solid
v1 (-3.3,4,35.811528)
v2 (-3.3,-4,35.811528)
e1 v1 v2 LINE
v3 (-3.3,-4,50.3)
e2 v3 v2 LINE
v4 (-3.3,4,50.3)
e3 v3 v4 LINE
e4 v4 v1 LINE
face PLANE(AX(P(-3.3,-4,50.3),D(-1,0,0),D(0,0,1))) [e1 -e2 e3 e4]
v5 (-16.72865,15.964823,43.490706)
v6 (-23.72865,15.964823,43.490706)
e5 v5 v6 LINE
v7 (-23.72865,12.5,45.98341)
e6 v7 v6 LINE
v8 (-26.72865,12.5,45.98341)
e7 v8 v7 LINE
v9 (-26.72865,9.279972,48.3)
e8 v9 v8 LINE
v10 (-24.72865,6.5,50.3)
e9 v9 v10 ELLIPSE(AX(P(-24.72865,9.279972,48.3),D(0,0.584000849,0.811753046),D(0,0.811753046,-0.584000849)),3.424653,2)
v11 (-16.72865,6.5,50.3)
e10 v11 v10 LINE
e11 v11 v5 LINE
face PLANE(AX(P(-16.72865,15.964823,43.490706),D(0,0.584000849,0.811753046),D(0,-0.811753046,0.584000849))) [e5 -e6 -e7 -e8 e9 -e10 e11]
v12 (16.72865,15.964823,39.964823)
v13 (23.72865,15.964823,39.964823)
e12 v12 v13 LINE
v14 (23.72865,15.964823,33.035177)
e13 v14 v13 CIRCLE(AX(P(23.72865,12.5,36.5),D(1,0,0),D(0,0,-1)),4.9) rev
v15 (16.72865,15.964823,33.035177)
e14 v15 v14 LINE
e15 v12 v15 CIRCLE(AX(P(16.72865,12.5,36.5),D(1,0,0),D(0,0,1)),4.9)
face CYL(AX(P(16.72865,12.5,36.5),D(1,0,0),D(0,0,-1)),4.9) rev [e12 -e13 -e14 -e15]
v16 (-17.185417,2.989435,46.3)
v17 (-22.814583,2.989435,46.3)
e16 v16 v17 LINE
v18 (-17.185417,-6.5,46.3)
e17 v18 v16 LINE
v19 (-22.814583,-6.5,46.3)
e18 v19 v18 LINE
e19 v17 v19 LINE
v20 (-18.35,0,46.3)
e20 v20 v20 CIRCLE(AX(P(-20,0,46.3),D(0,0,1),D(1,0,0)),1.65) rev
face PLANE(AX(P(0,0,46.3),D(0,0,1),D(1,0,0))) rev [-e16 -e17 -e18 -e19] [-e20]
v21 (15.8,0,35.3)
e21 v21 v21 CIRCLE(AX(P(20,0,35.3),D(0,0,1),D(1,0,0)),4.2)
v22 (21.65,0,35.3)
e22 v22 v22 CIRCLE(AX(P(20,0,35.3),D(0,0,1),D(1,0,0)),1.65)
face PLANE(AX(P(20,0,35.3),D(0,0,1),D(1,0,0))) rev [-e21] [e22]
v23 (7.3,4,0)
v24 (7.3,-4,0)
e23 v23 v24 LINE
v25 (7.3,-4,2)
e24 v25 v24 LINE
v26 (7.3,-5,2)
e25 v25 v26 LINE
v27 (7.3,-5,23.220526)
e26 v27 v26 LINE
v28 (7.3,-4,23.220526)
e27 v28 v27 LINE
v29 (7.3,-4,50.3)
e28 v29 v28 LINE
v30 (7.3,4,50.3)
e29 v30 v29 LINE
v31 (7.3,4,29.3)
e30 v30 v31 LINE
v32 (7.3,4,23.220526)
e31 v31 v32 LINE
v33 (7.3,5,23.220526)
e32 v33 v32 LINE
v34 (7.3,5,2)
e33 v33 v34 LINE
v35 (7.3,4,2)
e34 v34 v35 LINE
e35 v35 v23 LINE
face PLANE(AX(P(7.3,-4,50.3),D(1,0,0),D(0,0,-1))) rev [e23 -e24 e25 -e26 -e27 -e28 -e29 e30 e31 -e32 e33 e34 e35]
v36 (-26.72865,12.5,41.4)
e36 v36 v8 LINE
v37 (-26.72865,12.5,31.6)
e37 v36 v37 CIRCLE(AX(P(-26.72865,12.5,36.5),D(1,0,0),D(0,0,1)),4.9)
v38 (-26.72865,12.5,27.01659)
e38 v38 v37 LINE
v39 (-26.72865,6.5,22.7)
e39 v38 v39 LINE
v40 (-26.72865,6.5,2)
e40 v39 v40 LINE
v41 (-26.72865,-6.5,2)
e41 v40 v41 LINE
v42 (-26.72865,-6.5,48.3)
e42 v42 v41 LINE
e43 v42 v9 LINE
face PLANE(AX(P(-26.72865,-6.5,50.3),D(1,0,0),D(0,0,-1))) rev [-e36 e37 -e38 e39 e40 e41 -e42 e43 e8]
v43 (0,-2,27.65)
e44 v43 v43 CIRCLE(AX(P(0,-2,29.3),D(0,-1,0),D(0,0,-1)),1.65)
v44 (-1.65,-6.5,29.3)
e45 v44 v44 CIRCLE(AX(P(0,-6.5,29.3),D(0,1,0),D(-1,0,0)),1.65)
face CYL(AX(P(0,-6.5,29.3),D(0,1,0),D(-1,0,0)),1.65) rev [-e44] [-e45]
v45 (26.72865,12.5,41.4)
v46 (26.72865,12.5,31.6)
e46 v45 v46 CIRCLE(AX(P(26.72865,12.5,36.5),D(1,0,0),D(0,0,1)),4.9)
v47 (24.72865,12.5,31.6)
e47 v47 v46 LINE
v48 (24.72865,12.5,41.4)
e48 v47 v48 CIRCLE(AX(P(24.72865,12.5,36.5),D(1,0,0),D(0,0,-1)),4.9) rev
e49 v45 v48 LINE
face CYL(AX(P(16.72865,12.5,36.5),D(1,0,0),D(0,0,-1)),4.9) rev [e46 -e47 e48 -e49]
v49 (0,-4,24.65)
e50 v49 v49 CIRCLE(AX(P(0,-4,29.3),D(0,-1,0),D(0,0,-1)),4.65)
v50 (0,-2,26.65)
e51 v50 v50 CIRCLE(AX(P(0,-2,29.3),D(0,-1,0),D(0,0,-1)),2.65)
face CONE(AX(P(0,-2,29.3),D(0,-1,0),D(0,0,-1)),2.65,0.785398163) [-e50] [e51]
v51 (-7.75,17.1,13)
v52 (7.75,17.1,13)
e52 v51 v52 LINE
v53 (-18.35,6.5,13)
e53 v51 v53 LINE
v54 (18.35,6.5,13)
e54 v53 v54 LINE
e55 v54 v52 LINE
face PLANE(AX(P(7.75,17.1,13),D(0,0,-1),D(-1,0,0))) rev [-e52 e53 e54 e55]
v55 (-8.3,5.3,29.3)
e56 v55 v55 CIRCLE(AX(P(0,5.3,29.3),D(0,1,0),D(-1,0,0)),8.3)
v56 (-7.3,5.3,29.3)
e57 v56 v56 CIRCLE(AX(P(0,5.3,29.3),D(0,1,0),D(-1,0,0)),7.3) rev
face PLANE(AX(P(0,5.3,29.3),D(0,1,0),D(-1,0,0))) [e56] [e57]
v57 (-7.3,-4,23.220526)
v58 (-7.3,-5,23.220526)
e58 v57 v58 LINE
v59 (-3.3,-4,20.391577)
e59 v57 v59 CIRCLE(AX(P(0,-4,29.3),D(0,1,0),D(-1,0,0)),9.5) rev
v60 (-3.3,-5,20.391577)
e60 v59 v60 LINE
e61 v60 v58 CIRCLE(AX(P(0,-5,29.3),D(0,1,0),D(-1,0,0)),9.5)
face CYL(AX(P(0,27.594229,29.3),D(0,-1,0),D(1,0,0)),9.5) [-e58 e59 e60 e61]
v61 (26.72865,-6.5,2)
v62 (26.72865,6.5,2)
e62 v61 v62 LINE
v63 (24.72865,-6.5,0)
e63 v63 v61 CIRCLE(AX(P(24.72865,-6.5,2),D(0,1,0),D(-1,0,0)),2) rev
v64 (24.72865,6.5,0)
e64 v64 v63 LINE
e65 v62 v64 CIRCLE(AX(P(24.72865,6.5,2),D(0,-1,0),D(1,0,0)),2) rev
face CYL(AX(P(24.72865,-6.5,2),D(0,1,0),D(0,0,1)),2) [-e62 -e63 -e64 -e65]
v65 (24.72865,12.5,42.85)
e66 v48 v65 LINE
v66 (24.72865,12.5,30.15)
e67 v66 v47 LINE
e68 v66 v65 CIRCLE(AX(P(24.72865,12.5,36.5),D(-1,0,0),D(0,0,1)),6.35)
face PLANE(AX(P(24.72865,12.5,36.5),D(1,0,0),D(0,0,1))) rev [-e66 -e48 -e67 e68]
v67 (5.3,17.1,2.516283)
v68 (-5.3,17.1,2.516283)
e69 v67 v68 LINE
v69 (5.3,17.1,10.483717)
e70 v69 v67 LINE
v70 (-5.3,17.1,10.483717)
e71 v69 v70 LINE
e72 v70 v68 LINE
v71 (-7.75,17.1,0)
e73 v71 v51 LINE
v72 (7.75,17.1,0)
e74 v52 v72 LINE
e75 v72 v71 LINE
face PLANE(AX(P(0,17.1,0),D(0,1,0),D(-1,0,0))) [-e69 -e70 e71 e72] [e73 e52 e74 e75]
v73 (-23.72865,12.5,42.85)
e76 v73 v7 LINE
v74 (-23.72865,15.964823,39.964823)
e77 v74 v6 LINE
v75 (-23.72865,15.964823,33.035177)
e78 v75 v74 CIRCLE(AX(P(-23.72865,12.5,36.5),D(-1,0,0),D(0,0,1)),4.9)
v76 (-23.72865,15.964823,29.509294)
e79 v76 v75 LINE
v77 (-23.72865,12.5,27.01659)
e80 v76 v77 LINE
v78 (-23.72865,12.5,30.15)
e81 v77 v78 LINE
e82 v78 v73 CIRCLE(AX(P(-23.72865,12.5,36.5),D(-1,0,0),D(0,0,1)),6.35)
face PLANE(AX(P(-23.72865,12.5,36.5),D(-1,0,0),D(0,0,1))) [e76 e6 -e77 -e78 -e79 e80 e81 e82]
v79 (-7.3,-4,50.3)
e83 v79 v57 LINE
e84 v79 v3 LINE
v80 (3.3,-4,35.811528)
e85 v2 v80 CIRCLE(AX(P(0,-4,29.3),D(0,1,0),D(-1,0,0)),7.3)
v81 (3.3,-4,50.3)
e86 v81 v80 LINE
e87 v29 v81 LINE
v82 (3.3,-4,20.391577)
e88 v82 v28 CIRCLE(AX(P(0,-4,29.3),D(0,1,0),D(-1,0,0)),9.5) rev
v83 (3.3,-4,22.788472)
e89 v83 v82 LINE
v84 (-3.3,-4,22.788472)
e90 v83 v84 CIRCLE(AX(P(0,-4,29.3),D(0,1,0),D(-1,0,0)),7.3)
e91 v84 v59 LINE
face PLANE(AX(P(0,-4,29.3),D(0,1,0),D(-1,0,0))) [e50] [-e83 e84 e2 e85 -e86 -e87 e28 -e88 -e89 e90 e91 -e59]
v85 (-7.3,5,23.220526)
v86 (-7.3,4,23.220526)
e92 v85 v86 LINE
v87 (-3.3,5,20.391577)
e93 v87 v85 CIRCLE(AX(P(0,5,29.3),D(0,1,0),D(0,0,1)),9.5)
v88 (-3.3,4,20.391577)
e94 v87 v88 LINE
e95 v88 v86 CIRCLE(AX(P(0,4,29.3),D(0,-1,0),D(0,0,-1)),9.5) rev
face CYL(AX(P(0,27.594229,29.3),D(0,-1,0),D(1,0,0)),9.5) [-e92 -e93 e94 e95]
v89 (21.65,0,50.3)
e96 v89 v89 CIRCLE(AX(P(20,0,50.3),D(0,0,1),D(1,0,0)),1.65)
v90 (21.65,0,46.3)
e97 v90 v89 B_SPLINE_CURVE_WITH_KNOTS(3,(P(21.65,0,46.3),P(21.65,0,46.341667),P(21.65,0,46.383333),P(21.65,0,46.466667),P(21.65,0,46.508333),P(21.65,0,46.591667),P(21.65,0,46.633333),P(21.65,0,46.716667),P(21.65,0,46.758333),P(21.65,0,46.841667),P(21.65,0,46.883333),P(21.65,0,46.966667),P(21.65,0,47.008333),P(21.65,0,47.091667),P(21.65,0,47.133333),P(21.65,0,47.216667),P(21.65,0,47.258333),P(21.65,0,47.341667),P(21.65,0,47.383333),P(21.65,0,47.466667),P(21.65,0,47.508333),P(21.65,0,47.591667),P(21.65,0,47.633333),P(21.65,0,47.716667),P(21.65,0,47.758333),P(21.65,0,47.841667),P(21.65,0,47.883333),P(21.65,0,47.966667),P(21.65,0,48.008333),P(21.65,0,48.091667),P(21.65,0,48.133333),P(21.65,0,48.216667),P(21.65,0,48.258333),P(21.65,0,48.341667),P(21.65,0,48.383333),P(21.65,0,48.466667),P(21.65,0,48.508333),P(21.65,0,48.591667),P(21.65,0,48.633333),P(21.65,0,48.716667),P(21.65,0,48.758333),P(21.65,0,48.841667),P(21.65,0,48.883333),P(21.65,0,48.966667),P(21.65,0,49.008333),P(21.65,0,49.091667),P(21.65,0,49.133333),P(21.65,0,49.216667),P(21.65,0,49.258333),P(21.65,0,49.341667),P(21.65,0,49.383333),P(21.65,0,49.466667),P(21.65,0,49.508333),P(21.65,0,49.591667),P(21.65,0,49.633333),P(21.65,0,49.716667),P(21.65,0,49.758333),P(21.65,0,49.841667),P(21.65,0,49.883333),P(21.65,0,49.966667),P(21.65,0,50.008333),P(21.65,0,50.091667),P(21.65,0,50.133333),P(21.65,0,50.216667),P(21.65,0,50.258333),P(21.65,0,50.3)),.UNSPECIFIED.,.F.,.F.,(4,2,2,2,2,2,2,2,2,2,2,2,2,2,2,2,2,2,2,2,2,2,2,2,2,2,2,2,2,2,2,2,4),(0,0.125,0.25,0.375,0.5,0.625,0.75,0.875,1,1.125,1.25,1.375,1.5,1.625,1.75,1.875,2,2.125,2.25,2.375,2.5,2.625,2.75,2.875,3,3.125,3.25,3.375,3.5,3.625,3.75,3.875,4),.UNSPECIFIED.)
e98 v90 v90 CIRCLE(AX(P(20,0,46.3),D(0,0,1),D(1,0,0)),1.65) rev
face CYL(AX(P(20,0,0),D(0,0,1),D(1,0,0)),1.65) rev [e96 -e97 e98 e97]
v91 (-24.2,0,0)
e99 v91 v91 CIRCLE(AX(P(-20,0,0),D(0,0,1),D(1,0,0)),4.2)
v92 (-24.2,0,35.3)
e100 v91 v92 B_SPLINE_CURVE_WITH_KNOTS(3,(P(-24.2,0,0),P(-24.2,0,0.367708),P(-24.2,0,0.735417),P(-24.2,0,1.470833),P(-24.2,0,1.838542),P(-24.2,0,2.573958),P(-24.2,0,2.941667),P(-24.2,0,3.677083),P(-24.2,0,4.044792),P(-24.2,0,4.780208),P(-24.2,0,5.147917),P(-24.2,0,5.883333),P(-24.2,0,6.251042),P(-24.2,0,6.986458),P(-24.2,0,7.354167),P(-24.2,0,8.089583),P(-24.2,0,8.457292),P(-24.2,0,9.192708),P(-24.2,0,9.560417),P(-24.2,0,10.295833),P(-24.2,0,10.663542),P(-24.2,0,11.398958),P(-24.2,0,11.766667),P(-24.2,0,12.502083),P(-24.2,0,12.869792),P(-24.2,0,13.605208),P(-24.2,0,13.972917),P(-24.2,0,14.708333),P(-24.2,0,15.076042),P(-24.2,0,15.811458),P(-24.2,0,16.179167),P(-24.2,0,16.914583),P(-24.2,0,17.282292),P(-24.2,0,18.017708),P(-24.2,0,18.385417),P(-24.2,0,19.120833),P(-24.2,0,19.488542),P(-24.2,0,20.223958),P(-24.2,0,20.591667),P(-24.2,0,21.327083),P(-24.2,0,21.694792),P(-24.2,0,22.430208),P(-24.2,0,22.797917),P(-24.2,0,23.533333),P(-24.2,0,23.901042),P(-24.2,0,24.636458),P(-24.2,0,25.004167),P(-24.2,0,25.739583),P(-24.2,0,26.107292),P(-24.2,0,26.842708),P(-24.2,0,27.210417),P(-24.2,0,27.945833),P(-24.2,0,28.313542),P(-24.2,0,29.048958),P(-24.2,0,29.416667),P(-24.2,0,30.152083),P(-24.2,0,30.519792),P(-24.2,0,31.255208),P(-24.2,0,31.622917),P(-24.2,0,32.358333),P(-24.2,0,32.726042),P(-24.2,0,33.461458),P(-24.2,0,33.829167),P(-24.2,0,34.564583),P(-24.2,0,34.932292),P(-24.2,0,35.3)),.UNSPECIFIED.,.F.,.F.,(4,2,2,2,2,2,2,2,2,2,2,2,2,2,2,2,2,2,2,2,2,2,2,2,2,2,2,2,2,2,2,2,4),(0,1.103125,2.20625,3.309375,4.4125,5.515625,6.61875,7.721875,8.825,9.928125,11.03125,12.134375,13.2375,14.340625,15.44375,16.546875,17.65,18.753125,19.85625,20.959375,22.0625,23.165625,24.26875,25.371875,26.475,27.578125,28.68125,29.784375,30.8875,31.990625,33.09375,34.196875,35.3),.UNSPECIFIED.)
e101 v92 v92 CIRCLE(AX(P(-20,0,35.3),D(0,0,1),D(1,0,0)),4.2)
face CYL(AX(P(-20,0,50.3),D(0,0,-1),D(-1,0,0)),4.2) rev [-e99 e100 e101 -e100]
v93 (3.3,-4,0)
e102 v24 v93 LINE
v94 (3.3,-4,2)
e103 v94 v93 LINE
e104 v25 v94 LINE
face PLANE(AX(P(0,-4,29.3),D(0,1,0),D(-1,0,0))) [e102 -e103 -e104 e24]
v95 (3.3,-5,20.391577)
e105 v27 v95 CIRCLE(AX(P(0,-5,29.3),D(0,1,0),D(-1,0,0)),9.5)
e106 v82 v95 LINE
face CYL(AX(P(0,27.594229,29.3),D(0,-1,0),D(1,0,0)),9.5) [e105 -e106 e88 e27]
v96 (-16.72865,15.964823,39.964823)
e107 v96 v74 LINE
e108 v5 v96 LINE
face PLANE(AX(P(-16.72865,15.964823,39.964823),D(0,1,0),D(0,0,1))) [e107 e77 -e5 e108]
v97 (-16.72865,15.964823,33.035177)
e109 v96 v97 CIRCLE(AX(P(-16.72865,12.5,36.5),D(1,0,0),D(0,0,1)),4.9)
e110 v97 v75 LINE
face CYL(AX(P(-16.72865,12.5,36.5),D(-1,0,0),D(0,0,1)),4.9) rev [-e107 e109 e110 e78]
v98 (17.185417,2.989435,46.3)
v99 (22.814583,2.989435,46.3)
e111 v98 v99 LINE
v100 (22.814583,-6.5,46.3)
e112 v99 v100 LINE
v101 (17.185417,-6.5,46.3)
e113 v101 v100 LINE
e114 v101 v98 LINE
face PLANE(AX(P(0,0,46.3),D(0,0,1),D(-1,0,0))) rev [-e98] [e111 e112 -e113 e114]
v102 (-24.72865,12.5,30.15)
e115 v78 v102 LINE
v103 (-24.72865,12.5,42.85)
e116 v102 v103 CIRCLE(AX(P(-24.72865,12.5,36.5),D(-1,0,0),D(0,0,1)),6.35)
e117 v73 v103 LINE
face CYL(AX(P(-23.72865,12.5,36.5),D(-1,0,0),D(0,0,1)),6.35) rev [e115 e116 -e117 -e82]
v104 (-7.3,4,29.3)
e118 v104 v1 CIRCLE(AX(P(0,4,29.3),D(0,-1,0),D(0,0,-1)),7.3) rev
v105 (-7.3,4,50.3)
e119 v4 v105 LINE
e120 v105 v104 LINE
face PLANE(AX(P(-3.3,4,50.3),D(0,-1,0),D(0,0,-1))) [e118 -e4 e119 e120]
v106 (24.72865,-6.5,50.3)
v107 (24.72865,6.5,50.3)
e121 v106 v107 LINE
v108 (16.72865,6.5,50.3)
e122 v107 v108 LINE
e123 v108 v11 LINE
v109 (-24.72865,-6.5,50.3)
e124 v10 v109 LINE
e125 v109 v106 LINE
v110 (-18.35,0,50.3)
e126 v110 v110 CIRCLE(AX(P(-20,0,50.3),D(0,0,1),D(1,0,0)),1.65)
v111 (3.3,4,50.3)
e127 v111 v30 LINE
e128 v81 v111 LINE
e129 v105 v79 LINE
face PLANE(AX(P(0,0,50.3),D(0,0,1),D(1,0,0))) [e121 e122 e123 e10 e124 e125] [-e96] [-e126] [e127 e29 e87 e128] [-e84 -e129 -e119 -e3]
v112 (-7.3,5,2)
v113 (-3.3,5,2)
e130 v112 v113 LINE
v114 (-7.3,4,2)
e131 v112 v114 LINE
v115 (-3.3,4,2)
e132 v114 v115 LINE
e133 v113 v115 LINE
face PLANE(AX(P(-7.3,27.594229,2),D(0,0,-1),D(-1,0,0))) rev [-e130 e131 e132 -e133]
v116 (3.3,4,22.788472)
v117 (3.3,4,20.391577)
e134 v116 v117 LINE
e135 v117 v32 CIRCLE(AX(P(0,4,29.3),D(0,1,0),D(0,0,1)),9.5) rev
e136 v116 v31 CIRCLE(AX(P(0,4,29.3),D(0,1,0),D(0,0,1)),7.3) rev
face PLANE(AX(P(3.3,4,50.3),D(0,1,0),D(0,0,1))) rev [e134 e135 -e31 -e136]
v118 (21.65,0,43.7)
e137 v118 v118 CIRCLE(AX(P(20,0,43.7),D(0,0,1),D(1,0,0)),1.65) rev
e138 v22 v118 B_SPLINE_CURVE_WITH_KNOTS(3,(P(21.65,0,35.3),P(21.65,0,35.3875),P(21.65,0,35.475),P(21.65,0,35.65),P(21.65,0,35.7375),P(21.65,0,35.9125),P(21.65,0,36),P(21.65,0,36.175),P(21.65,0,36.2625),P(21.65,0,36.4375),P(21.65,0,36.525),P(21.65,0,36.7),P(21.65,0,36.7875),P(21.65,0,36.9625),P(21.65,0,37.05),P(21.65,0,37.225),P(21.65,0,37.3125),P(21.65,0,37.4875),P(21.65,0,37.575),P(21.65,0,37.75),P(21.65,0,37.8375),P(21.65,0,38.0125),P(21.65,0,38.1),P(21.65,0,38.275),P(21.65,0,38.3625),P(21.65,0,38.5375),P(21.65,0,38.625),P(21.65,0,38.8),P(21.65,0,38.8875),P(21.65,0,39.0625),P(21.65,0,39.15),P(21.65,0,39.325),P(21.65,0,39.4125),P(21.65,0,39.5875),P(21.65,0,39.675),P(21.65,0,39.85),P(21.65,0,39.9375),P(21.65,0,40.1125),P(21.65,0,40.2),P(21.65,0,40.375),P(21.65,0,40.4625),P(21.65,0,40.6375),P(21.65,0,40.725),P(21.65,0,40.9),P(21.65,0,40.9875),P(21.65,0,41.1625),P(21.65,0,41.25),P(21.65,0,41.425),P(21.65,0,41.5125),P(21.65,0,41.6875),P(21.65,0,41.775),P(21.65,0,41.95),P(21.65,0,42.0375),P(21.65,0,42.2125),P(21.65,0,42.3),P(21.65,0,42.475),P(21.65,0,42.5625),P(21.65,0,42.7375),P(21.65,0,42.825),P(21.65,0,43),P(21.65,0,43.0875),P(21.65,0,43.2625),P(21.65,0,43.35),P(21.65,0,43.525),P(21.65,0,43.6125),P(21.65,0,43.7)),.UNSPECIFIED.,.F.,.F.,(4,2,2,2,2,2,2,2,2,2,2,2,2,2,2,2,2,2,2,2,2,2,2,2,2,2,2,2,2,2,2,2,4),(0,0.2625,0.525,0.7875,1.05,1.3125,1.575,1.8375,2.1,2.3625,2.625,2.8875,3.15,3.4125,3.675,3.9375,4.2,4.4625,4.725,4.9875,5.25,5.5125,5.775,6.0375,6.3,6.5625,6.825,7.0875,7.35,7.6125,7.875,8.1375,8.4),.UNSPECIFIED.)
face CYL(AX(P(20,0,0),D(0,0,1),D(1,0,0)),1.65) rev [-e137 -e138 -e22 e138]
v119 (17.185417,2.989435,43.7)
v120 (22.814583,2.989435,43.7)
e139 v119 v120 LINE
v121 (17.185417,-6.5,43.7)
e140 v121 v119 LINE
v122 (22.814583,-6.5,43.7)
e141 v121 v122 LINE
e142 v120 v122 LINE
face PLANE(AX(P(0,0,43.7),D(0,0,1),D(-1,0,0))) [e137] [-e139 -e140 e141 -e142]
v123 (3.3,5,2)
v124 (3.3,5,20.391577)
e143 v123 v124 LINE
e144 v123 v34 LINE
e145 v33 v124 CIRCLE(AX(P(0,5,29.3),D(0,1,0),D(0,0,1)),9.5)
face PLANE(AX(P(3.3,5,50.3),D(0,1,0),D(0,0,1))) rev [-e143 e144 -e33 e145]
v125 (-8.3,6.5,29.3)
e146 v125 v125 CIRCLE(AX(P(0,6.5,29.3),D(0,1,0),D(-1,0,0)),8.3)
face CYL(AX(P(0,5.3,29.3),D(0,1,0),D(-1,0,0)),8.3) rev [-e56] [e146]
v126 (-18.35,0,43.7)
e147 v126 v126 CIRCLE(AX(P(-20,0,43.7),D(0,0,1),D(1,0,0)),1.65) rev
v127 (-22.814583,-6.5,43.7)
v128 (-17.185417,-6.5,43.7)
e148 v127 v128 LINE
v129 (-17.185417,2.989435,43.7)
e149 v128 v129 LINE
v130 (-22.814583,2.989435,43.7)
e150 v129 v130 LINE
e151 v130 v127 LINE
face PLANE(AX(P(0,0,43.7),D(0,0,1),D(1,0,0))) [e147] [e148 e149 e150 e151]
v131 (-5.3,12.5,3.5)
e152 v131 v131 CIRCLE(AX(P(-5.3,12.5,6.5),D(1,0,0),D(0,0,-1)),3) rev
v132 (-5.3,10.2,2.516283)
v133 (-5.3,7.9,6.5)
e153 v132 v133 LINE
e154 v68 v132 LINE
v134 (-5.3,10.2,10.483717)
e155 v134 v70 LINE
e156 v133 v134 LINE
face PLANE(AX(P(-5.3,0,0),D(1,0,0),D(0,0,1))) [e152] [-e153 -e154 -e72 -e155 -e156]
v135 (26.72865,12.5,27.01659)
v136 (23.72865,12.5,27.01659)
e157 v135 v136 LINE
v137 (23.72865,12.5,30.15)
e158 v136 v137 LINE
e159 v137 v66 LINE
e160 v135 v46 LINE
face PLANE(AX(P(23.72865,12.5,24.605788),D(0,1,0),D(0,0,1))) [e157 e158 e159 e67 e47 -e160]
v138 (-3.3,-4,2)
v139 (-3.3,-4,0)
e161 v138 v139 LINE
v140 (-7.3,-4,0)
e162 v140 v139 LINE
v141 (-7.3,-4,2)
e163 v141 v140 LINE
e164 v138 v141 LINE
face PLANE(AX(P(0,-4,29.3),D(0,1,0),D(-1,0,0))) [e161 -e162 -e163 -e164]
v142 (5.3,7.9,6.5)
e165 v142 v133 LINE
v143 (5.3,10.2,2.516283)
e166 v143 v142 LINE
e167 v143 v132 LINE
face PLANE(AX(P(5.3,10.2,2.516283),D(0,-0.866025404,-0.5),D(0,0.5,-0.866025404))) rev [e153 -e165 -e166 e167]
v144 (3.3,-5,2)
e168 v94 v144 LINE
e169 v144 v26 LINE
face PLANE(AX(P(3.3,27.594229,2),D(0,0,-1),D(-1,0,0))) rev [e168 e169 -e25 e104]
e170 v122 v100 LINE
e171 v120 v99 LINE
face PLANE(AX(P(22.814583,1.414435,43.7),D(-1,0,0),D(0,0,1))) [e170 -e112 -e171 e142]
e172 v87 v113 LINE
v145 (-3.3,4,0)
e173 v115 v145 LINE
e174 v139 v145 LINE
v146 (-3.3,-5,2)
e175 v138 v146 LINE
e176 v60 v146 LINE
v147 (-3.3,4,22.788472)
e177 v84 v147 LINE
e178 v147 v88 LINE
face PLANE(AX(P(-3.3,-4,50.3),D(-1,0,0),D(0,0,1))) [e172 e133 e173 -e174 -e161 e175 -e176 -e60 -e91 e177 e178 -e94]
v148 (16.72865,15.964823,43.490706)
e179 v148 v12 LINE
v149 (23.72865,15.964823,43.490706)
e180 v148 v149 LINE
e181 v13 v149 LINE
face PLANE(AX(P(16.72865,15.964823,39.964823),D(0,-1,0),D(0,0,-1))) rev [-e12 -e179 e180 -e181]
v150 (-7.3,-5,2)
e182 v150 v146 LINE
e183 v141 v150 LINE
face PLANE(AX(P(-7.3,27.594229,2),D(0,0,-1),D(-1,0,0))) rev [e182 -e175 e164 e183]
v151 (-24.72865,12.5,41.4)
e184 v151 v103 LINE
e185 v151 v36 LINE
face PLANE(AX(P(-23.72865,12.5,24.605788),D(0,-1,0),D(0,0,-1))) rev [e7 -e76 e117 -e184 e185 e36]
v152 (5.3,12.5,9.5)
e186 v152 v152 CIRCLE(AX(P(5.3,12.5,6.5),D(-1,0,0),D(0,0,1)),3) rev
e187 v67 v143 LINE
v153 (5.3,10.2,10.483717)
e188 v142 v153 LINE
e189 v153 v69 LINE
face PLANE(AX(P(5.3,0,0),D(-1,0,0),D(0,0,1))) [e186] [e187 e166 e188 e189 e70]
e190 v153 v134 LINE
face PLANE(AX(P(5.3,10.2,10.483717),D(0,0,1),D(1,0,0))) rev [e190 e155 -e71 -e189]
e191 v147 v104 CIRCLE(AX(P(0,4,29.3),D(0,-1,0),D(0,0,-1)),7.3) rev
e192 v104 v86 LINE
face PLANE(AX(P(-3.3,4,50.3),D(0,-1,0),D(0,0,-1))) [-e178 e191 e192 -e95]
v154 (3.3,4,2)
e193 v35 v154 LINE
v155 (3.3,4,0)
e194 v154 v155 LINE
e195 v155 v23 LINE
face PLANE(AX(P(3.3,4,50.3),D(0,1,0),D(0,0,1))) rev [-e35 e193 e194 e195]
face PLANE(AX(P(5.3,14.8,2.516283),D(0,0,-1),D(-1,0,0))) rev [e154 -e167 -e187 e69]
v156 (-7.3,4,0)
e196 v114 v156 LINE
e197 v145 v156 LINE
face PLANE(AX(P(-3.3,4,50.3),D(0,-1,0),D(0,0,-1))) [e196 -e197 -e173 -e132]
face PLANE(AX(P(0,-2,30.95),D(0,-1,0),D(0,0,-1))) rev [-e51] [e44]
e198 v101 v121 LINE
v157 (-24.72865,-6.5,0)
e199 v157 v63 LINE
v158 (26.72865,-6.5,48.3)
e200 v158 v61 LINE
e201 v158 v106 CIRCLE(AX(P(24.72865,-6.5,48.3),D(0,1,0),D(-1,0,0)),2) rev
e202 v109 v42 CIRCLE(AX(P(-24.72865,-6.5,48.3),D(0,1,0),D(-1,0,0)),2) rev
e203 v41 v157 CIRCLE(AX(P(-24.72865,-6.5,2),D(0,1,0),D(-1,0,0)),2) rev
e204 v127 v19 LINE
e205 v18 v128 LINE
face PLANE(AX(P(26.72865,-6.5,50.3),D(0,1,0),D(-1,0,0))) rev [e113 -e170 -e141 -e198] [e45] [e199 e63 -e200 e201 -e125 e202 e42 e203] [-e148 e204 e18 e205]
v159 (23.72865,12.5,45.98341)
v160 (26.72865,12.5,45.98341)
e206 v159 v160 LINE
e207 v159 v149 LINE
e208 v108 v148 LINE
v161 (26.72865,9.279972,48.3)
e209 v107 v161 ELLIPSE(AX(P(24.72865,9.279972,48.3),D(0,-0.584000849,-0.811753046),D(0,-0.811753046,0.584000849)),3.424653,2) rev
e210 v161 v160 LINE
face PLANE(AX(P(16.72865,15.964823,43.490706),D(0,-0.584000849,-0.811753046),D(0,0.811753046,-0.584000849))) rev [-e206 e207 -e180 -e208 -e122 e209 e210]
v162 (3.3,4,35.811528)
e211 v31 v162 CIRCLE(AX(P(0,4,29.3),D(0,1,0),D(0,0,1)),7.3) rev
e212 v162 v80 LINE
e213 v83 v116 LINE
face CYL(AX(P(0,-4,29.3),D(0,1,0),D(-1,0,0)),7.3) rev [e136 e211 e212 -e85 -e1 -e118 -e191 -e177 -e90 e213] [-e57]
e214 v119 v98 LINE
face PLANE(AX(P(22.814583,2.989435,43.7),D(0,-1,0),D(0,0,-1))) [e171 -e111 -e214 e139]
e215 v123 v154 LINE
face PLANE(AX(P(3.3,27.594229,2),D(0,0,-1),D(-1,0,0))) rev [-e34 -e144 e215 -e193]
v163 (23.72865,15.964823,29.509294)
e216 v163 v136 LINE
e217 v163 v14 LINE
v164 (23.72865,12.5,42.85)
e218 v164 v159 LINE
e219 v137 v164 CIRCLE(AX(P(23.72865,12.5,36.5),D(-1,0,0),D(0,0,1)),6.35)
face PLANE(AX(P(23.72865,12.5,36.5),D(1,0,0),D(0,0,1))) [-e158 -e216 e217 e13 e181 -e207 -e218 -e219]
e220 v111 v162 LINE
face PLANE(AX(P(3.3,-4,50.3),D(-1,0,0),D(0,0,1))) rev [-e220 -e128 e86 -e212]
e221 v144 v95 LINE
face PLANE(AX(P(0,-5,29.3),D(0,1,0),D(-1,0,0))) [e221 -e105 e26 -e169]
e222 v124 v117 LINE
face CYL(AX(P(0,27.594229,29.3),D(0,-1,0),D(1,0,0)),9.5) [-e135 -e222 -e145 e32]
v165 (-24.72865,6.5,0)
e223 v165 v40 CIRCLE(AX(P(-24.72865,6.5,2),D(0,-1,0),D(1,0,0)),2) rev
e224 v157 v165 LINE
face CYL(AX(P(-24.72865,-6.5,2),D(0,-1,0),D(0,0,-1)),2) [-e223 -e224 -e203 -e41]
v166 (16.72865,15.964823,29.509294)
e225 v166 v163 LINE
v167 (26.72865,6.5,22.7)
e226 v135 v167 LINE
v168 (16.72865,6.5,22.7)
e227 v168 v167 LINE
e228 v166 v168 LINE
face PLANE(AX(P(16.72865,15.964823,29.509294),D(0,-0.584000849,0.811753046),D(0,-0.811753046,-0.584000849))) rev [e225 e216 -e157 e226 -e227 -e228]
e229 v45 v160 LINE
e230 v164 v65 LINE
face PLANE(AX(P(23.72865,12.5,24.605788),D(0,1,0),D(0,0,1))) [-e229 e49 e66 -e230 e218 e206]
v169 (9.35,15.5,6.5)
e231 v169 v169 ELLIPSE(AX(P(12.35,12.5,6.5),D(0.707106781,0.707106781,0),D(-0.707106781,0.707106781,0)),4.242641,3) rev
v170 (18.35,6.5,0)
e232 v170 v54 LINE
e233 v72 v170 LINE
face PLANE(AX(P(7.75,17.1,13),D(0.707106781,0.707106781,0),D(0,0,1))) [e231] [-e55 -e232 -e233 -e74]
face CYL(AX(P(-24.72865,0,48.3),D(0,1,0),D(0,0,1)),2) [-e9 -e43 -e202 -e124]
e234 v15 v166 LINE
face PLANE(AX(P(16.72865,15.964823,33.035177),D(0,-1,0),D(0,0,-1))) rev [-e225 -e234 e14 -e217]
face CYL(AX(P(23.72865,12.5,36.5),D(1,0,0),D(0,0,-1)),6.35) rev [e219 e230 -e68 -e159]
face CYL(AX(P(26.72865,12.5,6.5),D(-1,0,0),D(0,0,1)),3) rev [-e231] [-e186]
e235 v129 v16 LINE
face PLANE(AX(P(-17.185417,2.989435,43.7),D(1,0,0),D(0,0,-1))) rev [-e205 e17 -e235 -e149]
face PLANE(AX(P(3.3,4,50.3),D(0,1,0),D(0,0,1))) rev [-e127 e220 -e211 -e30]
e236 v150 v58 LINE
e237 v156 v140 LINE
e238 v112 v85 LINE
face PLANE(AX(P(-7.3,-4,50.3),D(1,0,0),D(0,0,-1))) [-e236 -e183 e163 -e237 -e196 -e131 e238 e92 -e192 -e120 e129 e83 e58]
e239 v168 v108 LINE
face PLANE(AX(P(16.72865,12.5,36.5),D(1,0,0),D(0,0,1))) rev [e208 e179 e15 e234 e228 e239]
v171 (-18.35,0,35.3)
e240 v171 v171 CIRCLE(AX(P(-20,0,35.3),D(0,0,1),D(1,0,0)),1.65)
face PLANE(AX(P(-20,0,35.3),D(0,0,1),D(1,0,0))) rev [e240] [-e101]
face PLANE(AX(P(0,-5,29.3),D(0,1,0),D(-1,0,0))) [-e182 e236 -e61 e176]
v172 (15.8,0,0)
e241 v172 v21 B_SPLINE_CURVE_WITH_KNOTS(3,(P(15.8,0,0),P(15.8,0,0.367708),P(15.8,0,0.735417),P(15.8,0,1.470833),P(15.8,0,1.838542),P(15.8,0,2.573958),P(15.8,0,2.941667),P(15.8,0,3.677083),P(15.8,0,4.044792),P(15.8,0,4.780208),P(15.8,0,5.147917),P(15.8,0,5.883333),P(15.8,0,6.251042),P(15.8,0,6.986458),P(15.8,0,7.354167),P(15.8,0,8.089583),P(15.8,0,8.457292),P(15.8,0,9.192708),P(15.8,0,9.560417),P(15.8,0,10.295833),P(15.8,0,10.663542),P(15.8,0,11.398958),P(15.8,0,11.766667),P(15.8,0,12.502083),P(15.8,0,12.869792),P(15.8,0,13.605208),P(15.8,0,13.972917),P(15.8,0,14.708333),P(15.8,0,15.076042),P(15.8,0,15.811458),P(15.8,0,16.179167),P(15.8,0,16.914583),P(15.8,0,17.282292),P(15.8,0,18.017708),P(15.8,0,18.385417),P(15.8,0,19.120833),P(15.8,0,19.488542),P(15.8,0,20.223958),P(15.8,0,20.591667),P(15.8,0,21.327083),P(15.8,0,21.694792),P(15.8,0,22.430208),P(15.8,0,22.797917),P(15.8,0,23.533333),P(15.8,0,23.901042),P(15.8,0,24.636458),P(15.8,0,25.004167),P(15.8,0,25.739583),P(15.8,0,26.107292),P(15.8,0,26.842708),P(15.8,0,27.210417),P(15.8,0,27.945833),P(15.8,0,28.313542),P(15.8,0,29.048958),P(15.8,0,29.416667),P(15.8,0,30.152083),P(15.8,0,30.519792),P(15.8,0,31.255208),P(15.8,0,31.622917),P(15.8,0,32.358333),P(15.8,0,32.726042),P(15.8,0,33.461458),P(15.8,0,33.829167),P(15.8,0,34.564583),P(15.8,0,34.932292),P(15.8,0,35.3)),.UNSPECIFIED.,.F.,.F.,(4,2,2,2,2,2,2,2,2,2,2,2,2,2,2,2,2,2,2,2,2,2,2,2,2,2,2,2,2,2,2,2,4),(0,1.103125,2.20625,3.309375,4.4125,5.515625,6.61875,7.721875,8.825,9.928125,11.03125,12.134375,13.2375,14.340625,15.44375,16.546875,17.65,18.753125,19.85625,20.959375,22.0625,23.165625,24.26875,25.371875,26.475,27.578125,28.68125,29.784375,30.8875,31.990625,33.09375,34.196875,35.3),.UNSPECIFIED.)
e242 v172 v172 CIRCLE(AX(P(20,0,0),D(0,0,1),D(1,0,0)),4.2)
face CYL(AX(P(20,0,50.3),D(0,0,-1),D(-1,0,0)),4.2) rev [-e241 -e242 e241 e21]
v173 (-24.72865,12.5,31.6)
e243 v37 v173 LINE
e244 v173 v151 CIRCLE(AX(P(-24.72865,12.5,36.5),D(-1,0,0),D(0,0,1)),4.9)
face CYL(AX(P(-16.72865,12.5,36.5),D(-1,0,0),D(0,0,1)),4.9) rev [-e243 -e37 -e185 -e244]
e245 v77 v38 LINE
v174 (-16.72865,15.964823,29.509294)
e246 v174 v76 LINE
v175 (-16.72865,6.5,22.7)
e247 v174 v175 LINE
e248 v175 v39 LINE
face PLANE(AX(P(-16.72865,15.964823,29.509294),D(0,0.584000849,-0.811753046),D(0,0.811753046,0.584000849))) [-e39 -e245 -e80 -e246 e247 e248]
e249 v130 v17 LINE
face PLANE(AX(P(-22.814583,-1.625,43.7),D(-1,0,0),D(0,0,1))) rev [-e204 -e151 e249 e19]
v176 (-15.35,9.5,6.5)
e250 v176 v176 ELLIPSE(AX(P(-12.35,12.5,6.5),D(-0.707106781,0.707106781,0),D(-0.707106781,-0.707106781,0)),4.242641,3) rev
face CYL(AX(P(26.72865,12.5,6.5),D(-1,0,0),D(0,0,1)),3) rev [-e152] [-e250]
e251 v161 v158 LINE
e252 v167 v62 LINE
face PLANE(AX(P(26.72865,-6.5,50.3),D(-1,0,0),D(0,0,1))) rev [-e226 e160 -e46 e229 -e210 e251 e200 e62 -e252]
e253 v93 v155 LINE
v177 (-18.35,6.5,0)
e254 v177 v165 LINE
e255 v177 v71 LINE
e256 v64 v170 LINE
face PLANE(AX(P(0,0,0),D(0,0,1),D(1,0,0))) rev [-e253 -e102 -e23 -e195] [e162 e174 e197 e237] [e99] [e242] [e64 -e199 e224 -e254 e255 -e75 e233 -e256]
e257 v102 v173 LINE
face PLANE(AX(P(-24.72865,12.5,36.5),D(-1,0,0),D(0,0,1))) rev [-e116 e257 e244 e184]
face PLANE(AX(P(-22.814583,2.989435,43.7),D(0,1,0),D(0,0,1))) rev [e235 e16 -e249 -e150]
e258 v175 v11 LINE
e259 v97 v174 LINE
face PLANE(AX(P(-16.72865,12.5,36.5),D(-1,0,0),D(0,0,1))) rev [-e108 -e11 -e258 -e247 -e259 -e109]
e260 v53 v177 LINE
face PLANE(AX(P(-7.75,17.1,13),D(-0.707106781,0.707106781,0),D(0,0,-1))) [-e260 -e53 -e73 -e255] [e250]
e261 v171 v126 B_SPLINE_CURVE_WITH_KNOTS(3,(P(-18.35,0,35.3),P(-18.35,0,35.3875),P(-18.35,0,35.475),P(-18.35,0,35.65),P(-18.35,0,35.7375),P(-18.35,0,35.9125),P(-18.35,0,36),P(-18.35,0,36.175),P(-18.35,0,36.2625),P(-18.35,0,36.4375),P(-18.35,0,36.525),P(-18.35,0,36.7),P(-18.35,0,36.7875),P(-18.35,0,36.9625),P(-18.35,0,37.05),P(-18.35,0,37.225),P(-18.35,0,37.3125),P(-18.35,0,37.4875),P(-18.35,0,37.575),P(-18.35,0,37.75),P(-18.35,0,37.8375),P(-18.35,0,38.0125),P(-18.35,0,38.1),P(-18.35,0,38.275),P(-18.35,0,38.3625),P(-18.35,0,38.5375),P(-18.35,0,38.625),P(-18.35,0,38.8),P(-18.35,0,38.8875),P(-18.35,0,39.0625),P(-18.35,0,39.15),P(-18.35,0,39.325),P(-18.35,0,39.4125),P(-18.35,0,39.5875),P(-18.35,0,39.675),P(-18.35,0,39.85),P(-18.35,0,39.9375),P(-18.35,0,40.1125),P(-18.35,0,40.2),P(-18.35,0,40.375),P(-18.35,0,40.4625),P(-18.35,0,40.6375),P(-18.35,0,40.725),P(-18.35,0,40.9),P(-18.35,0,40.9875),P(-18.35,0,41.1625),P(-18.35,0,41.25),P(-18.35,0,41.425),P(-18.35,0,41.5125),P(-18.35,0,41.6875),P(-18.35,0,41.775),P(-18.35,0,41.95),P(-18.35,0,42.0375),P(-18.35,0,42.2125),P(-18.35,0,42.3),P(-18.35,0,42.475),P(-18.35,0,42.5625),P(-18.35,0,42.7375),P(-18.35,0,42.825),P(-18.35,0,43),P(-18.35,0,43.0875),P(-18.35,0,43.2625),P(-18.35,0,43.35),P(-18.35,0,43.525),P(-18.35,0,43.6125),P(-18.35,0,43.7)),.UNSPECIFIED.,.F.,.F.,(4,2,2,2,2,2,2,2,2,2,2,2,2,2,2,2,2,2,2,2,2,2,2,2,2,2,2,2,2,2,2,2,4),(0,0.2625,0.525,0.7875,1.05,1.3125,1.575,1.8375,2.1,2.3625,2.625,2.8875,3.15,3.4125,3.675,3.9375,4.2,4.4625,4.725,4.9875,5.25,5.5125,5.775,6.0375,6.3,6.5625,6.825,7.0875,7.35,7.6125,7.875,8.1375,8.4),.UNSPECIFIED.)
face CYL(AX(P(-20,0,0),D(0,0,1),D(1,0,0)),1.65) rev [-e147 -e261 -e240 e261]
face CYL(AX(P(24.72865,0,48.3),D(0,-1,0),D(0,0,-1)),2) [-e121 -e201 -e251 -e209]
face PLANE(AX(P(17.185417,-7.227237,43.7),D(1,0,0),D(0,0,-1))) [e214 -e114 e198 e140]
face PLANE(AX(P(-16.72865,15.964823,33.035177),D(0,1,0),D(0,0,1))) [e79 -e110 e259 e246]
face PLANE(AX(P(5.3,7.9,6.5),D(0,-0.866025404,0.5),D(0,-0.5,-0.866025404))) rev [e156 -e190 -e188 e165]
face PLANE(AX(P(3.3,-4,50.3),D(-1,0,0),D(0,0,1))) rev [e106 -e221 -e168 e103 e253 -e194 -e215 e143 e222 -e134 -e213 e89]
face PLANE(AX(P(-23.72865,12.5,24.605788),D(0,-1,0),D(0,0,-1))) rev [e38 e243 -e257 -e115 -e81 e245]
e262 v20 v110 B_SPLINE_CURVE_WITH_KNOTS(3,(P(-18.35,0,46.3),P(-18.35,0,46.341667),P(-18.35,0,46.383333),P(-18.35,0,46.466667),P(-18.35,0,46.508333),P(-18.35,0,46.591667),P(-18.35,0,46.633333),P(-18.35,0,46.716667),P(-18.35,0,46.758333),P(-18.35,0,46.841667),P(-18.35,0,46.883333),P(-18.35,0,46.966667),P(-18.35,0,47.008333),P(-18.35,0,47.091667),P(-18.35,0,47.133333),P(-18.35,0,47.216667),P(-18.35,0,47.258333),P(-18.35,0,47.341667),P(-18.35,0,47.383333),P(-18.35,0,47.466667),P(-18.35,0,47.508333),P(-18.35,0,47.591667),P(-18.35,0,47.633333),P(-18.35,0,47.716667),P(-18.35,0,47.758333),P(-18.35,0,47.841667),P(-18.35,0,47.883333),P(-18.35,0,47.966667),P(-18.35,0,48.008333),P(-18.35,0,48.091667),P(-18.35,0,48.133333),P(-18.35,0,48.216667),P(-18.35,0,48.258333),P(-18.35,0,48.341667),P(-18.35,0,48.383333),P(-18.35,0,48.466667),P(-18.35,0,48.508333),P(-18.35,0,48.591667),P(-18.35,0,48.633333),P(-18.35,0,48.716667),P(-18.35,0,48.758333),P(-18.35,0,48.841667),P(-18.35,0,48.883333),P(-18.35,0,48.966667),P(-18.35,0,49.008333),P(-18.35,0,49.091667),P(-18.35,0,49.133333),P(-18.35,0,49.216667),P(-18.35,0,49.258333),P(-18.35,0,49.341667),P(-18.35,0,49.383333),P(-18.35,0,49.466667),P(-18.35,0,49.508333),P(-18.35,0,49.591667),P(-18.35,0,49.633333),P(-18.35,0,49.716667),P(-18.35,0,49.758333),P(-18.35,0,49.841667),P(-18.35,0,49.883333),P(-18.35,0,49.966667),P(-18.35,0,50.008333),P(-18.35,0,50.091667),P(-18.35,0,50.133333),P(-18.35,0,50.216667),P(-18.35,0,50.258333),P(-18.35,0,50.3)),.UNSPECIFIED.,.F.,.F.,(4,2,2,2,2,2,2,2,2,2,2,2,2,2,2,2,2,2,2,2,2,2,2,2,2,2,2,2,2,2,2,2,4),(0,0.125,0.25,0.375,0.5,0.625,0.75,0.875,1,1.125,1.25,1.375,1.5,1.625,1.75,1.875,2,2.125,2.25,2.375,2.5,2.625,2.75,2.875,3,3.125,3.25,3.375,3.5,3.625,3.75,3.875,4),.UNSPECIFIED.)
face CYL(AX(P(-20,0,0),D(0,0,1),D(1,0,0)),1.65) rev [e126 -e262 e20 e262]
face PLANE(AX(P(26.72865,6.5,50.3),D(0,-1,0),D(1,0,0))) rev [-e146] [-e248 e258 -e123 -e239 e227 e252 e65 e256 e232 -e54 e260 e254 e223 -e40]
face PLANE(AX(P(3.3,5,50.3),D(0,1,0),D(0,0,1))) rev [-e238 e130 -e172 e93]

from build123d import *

# Parameters (mm, degrees)
SKETCH1_W           = 53.4573
SKETCH1_H           = 13
SKETCH1_R           = 4.2
BOSS_EXTRUDE1_DEPTH = 50.3
BOSS_EXTRUDE2_START = -15
SKETCH3_R           = 4.2
BOSS_EXTRUDE2_DEPTH = 15
SKETCH8_W           = 15.5
SKETCH8_H           = 13
BOSS_EXTRUDE3_DEPTH = 10.6
CHAMFER1_SIZE       = 10.6
SKETCH5_R           = 3
SKETCH5_R_2         = 4
CUT_EXTRUDE1_DEPTH  = 76.366988286
CUT_EXTRUDE2_DEPTH  = 5.3
BOSS_EXTRUDE4_DEPTH = 10
CUT_EXTRUDE3_DEPTH  = 1
SKETCH13_W          = 21.695080859
SKETCH13_H          = 9.09610943
CUT_EXTRUDE4_DEPTH  = 3
SKETCH16_R          = 1.65
CUT_EXTRUDE5_DEPTH  = 59.425257644
SKETCH17_R          = 7.3
CUT_EXTRUDE6_DEPTH  = 10.5
SKETCH15_W          = 4
SKETCH15_H          = 8
CUT_EXTRUDE7_DEPTH  = 60.472016368
SKETCH18_R          = 8.3
CUT_EXTRUDE8_DEPTH  = 1.2
SKETCH21_R          = 1.65
CUT_EXTRUDE9_DEPTH  = 60.472016368
CUT_EXTRUDE10_DEPTH = 2.6
FILLET1_R           = 2
CUT_EXTRUDE11_START = -1
CUT_EXTRUDE11_DEPTH = 10


# Read off the part's stored shape, not the designer's step: Cut-Extrude11
with BuildPart() as part:
    # Sketch1 → Boss-Extrude1 (new body)
    with BuildSketch(Plane.XY):
        Rectangle(SKETCH1_W, SKETCH1_H)
        with Locations(Location((-20, 0, 0), (0, 0, 180))):
            Circle(SKETCH1_R, mode=Mode.SUBTRACT)
        with Locations(Location((20, 0, 0), (0, 0, 180))):
            Circle(SKETCH1_R, mode=Mode.SUBTRACT)
    extrude(amount=BOSS_EXTRUDE1_DEPTH)

    # Sketch3 → Boss-Extrude2 (add)
    with BuildSketch(Plane.XY.offset(50.3).offset(BOSS_EXTRUDE2_START)):
        with Locations(Location((-20, 0, 0), (0, 0, 180))):
            Circle(SKETCH3_R)
        with Locations(Location((20, 0, 0), (0, 0, 180))):
            Circle(SKETCH3_R)
    extrude(amount=BOSS_EXTRUDE2_DEPTH)

    # Sketch8 → Boss-Extrude3 (add)
    with BuildSketch(Plane(origin=(0, 6.5, 0), x_dir=(1, 0, 0), z_dir=(0, 1, 0))):
        with Locations((0, -6.5)):
            Rectangle(SKETCH8_W, SKETCH8_H)
    extrude(amount=BOSS_EXTRUDE3_DEPTH)

    # Chamfer1
    chamfer1_edges = [part.edges().sort_by_distance(p)[0] for p in [
        (7.75, 6.5, 6.5),
        (-7.75, 6.5, 6.5),
    ]]
    chamfer(chamfer1_edges, length=CHAMFER1_SIZE - 0.0001)  # a hair under: the kernel refuses the full size

    # Sketch5 → Cut-Extrude1 (cut, through all)
    with BuildSketch(Plane.ZY.offset(26.72865)):
        with Locations(Location((6.5, 12.5, 0), (0, 0, 270))):
            Circle(SKETCH5_R)
        with Locations((36.5, 12.5)):
            Circle(SKETCH5_R_2)
    extrude(amount=-CUT_EXTRUDE1_DEPTH, mode=Mode.SUBTRACT)

    # Sketch10 → Cut-Extrude2 (cut)
    with BuildSketch(Plane.ZY):
        Polygon((2.516283143, 14.8), (2.516283143, 17.1), (10.483716857, 17.1), (10.483716857, 14.8), (10.483716857, 10.2), (6.5, 7.9), (2.516283143, 10.2), align=None)
    cut_extrude2 = extrude(amount=-CUT_EXTRUDE2_DEPTH, mode=Mode.SUBTRACT)

    # Mirror1: Cut-Extrude2 across plane
    add(cut_extrude2.mirror(Plane.ZY), mode=Mode.SUBTRACT)

    # Sketch11 → Boss-Extrude4 (add)
    with BuildSketch(Plane.ZY.offset(26.72865)):
        with BuildLine():
            Line((33.035176772, 15.964823228), (29.509293572, 15.964823228))
            Line((29.509293572, 15.964823228), (22.7, 6.5))
            Line((22.7, 6.5), (50.3, 6.5))
            Line((50.3, 6.5), (43.490706428, 15.964823228))
            Line((43.490706428, 15.964823228), (39.964823228, 15.964823228))
            ThreePointArc((39.964823228, 15.964823228), (36.5, 7.6), (33.035176772, 15.964823228))
        make_face()
    boss_extrude4 = extrude(amount=-BOSS_EXTRUDE4_DEPTH)

    # Sketch12 → Cut-Extrude3 (cut)
    with BuildSketch(Plane.ZY.offset(24.72865)):
        with BuildLine():
            Line((30.15, 12.5), (30.15, 21.960655534))
            Line((30.15, 21.960655534), (42.85, 21.960655534))
            Line((42.85, 21.960655534), (42.85, 12.5))
            ThreePointArc((42.85, 12.5), (36.5, 6.15), (30.15, 12.5))
        make_face()
    cut_extrude3 = extrude(amount=-CUT_EXTRUDE3_DEPTH, mode=Mode.SUBTRACT)

    # Sketch13 → Cut-Extrude4 (cut)
    with BuildSketch(Plane.ZY.offset(26.72865)):
        with Locations((35.453328021, 17.048054715)):
            Rectangle(SKETCH13_W, SKETCH13_H)
    cut_extrude4 = extrude(amount=-CUT_EXTRUDE4_DEPTH, mode=Mode.SUBTRACT)

    # Mirror2: Boss-Extrude4, Cut-Extrude3, Cut-Extrude4 across plane
    add(boss_extrude4.mirror(Plane.ZY))
    add(cut_extrude3.mirror(Plane.ZY), mode=Mode.SUBTRACT)
    add(cut_extrude4.mirror(Plane.ZY), mode=Mode.SUBTRACT)

    # Sketch16 → Cut-Extrude5 (cut, through all)
    with BuildSketch(Plane(origin=(0, 6.5, 0), x_dir=(1, 0, 0), z_dir=(0, 1, 0))):
        with Locations(Location((0, -29.3, 0), (0, 0, 180))):
            Circle(SKETCH16_R)
    extrude(amount=-CUT_EXTRUDE5_DEPTH, mode=Mode.SUBTRACT)

    # Sketch17 → Cut-Extrude6 (cut)
    with BuildSketch(Plane(origin=(0, 6.5, 0), x_dir=(1, 0, 0), z_dir=(0, 1, 0))):
        with Locations(Location((0, -29.3, 0), (0, 0, 180))):
            Circle(SKETCH17_R)
    extrude(amount=-CUT_EXTRUDE6_DEPTH, mode=Mode.SUBTRACT)

    # Sketch15 → Cut-Extrude7 (cut, through all)
    with BuildSketch(Plane(origin=(0, 0, 0), x_dir=(-1, 0, 0), z_dir=(0, 0, -1))):
        with Locations((-5.3, 0)):
            Rectangle(SKETCH15_W, SKETCH15_H)
    cut_extrude7 = extrude(amount=-CUT_EXTRUDE7_DEPTH, mode=Mode.SUBTRACT)

    # Mirror3: Cut-Extrude7 across plane
    add(cut_extrude7.mirror(Plane.ZY), mode=Mode.SUBTRACT)

    # Sketch18 → Cut-Extrude8 (cut)
    with BuildSketch(Plane(origin=(0, 6.5, 0), x_dir=(1, 0, 0), z_dir=(0, 1, 0))):
        with Locations(Location((0, -29.3, 0), (0, 0, 180))):
            Circle(SKETCH18_R)
    extrude(amount=-CUT_EXTRUDE8_DEPTH, mode=Mode.SUBTRACT)

    # Sketch20 → Revolve1 (revolve)
    with BuildSketch(Plane.ZY, mode=Mode.PRIVATE) as revolve1_sk:
        Polygon((30.95, -4), (30.95, -2), (31.95, -2), (33.95, -4), align=None)
    revolve(revolve1_sk.sketch.rotate(Axis((0, -4, 29.3), (0, 1, 0)), 270), axis=Axis((0, -4, 29.3), (0, 1, 0)))

    # Sketch21 → Cut-Extrude9 (cut, through all)
    with BuildSketch(Plane.XY.offset(50.3)):
        with Locations((20, 0)):
            Circle(SKETCH21_R)
        with Locations((-20, 0)):
            Circle(SKETCH21_R)
    extrude(amount=-CUT_EXTRUDE9_DEPTH, mode=Mode.SUBTRACT)

    # Sketch22 → Cut-Extrude10 (cut)
    with BuildSketch(Plane.XY.offset(46.3)):
        Polygon((-22.814582562, 1.414434516), (-22.814582562, 2.989434516), (-17.185417438, 2.989434516), (-17.185417438, 1.497865113), (-17.185417438, -1.625), (-17.185417438, -7.227237341), (-22.814582562, -7.227237341), (-22.814582562, -1.625), align=None)
    cut_extrude10 = extrude(amount=-CUT_EXTRUDE10_DEPTH, mode=Mode.SUBTRACT)

    # Mirror4: Cut-Extrude10 across plane
    add(cut_extrude10.mirror(Plane.ZY), mode=Mode.SUBTRACT)

    # Fillet1
    fillet1_edges = [part.edges().sort_by_distance(p)[0] for p in [
        (26.72865, 0, 0),
        (26.72865, 0, 50.3),
        (-26.72865, 0, 0),
        (-26.72865, 0, 50.3),
    ]]
    fillet(fillet1_edges, radius=FILLET1_R)

    # Cut-Extrude11 outline → Cut-Extrude11 (cut)
    with BuildSketch(Plane(origin=(0, -4, 0), x_dir=(1, 0, 0), z_dir=(0, 1, 0)).offset(CUT_EXTRUDE11_START)):
        with BuildLine():
            ThreePointArc((3.3, -20.391577019), (5.485502581, -21.543759839), (7.3, -23.220526339))
            Line((7.3, -23.220526339), (7.3, -2))
            Line((7.3, -2), (3.3, -2))
            Line((3.3, -2), (3.3, -20.391577019))
        make_face()
        with BuildLine():
            Line((-7.3, -2), (-7.3, -23.220526339))
            ThreePointArc((-7.3, -23.220526339), (-5.485502581, -21.543759839), (-3.3, -20.391577019))
            Line((-3.3, -20.391577019), (-3.3, -2))
            Line((-3.3, -2), (-7.3, -2))
        make_face()
    extrude(amount=CUT_EXTRUDE11_DEPTH, mode=Mode.SUBTRACT)


solid = part.part
